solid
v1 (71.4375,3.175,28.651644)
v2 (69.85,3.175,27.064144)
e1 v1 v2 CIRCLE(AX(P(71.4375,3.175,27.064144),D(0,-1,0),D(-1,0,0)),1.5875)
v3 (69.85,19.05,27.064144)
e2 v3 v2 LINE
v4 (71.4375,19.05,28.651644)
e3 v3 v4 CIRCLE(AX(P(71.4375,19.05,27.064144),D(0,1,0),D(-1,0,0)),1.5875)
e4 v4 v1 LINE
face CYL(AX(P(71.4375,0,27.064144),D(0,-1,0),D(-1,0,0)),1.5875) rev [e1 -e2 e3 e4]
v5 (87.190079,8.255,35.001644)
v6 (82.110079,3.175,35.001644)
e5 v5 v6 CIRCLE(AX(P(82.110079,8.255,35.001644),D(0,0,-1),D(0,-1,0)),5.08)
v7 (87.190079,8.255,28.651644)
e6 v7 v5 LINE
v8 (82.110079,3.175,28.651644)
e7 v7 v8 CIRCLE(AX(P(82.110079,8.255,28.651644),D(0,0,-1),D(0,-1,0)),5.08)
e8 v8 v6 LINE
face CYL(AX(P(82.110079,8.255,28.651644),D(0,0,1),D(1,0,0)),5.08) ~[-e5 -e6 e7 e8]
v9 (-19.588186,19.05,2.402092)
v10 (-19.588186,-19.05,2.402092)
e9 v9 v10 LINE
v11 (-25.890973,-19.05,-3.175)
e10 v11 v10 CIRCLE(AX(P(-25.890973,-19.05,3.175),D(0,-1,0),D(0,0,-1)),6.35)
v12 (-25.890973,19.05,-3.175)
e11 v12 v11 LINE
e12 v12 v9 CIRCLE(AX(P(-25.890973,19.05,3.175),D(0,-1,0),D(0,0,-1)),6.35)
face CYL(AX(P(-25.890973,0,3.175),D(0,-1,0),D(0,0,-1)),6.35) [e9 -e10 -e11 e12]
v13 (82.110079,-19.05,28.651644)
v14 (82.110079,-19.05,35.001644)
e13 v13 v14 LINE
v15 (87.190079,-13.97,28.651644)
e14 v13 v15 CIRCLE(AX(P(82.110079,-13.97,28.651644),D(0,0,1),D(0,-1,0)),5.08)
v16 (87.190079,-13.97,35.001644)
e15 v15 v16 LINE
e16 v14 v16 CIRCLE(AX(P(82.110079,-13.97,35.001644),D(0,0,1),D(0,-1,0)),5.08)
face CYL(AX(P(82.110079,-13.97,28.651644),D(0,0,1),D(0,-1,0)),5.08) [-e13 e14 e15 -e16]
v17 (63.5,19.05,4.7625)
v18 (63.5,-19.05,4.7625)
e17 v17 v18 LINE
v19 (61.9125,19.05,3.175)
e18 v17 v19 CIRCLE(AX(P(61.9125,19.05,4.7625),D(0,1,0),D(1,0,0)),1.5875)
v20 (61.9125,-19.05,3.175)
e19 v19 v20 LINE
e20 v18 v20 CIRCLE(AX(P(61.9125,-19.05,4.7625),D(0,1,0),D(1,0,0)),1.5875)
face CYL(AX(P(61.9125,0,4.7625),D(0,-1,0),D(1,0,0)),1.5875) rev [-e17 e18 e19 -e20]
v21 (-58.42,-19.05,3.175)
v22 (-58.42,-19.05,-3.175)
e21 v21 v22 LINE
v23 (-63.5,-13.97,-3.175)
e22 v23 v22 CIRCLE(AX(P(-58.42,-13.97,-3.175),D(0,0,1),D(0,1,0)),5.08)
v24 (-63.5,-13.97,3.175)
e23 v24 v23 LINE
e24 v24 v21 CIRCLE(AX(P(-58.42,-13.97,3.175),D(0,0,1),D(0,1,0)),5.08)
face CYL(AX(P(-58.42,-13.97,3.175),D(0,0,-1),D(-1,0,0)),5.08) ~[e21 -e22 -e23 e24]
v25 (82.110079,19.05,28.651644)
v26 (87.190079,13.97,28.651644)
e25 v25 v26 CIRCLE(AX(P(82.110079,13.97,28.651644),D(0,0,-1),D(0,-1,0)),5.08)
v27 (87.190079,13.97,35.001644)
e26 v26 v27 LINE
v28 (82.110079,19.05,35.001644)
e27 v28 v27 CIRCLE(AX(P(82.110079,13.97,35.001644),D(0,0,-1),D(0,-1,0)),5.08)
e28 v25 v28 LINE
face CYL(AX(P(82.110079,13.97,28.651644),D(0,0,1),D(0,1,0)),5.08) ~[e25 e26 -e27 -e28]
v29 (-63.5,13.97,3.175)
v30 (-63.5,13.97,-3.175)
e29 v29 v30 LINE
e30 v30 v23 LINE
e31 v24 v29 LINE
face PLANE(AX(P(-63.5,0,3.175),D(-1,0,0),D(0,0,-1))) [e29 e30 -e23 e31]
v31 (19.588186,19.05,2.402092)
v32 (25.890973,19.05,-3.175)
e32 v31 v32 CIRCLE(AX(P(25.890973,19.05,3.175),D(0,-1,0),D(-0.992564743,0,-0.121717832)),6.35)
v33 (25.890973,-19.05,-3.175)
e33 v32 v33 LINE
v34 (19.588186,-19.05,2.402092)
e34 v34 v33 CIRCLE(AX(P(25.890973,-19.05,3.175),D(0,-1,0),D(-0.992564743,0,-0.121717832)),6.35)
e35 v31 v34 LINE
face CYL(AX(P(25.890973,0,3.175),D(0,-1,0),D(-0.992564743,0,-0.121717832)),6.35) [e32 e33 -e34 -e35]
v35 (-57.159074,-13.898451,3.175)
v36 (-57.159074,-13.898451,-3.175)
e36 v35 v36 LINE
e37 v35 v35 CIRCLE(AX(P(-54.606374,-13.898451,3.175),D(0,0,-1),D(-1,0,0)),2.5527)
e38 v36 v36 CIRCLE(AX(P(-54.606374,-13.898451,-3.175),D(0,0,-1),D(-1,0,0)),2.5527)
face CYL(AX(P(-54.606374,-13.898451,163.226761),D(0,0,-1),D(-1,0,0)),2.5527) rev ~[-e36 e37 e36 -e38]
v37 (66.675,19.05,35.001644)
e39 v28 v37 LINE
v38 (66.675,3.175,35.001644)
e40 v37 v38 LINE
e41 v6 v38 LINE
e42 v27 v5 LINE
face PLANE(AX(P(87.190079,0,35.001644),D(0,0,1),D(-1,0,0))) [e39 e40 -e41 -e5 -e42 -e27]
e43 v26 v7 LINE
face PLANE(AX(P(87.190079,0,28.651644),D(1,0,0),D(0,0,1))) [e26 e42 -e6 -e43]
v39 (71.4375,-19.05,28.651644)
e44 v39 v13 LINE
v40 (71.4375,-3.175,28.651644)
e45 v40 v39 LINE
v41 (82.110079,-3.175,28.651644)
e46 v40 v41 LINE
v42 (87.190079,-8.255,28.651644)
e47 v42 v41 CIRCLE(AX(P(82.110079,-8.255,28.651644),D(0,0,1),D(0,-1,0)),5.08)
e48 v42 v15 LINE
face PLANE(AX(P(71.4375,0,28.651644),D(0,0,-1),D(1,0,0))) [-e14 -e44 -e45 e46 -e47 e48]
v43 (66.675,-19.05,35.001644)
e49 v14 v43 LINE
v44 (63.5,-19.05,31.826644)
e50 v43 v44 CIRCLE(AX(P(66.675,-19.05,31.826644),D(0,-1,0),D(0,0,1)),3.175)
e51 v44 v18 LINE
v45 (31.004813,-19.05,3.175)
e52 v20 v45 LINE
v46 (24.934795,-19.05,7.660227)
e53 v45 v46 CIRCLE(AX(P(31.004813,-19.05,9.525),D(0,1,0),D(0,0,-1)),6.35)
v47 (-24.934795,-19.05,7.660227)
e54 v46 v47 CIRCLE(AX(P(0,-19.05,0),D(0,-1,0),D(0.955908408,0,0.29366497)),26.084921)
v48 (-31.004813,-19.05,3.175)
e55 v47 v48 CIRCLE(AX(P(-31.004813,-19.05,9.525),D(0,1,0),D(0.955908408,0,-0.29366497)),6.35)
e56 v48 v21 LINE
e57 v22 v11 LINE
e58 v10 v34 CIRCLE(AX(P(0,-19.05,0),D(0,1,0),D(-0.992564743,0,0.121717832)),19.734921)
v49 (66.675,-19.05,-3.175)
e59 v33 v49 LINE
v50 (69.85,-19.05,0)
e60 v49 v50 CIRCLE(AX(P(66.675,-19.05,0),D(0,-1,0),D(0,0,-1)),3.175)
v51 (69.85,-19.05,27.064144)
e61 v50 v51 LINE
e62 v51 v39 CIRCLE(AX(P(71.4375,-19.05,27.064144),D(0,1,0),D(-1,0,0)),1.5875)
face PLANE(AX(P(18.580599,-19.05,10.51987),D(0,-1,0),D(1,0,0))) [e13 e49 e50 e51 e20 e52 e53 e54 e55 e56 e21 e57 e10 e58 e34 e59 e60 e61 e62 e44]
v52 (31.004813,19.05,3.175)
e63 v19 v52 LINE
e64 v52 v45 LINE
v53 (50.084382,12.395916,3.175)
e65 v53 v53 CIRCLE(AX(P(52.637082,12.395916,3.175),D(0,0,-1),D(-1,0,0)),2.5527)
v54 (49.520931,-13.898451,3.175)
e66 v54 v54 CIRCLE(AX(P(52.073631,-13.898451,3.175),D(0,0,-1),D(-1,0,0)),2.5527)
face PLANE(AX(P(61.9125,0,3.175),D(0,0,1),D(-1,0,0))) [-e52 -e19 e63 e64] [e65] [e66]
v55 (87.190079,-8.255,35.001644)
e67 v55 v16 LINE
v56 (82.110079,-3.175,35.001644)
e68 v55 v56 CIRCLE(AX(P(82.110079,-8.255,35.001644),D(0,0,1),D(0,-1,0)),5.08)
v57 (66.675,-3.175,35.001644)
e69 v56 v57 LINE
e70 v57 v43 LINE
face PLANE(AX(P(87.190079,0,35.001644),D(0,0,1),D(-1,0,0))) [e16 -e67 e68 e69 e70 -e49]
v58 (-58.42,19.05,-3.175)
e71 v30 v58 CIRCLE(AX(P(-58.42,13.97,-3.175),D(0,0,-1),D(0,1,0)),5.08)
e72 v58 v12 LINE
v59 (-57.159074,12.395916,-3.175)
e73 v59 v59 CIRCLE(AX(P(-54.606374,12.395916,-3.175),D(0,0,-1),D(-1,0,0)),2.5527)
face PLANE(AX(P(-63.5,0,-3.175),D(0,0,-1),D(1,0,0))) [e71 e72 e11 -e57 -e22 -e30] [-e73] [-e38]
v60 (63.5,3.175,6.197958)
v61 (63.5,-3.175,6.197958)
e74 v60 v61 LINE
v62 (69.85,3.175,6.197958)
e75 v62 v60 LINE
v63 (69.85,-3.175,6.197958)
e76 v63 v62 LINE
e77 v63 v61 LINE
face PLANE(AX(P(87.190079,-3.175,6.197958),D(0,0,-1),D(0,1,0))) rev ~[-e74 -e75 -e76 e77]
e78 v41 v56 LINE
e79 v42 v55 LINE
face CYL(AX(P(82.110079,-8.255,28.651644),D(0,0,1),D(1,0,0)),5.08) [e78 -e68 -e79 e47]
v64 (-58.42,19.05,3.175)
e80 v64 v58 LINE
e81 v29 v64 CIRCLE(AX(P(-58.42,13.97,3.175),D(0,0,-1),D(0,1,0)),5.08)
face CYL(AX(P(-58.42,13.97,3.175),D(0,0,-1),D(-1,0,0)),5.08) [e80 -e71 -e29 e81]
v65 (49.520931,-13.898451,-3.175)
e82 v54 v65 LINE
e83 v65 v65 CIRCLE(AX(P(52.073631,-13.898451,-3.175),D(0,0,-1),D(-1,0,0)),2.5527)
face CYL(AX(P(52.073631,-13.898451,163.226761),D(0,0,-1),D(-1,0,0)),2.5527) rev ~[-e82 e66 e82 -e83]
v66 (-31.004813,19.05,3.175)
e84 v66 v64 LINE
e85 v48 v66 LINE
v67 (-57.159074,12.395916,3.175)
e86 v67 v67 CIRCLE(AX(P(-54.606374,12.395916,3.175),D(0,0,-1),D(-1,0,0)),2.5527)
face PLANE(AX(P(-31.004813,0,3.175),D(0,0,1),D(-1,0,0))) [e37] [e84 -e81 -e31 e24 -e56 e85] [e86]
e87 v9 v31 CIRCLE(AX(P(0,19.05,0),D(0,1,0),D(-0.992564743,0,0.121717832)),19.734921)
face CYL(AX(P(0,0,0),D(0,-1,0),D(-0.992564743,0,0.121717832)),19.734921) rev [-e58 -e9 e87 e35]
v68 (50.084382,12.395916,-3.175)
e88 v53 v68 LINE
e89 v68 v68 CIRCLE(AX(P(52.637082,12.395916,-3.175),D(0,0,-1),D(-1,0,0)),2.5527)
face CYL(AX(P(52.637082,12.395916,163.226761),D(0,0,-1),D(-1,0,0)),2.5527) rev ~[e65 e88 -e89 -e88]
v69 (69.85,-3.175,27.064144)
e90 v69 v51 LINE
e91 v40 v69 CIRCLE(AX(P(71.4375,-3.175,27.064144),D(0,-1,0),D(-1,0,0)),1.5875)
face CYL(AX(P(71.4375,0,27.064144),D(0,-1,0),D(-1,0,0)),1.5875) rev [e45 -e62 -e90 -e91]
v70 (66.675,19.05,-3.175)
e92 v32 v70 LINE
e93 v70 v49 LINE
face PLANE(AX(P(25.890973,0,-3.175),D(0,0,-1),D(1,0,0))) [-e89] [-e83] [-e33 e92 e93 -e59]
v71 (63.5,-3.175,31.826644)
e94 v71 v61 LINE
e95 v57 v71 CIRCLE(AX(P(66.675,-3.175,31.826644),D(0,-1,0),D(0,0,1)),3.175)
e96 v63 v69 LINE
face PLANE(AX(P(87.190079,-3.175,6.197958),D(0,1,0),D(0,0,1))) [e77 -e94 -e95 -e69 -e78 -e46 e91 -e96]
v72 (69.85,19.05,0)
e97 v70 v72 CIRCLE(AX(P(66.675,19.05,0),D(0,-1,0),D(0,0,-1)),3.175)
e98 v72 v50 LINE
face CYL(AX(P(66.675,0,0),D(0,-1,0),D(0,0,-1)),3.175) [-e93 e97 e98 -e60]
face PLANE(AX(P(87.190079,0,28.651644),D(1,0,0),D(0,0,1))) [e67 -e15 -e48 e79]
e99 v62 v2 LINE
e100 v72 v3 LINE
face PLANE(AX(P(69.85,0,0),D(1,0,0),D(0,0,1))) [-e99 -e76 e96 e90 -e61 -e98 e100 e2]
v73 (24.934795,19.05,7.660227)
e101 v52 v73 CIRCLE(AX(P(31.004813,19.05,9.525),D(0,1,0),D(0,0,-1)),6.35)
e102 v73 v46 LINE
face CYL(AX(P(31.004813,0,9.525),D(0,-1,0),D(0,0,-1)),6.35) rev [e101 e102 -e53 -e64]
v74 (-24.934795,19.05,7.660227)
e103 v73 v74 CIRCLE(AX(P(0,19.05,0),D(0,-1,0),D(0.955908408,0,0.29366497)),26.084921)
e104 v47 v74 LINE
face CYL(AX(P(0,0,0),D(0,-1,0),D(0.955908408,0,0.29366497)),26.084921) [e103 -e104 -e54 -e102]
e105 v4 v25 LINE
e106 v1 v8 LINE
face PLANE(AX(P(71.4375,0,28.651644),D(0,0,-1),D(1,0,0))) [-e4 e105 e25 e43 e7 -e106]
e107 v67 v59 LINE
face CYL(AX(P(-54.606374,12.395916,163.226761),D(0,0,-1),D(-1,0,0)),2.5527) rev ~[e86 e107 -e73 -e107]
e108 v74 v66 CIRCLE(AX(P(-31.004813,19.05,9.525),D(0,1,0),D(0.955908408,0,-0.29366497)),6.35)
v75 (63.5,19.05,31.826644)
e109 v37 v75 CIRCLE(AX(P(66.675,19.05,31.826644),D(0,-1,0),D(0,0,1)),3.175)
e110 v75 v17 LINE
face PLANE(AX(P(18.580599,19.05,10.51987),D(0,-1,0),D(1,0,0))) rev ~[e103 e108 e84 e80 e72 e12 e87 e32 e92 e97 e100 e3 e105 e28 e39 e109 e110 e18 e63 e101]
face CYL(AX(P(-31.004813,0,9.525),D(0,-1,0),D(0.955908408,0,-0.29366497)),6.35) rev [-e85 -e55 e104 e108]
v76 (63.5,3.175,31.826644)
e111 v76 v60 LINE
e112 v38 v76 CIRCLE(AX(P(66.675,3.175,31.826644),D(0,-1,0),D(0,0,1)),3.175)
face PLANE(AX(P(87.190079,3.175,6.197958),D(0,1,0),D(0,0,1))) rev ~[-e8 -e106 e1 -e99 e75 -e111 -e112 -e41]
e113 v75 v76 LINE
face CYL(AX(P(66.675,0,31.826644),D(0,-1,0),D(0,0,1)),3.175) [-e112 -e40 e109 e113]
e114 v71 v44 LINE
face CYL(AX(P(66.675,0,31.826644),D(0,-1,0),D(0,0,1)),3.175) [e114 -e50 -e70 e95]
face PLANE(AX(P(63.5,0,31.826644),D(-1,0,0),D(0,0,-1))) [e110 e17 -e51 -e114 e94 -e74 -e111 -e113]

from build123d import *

# Parameters (mm, degrees)
F1_DEPTH = 19.05
F2_W     = 6.35
F2_H     = 28.8036865525
F3_DEPTH = 25.4
F4_R     = 5.08
F6_D     = 5.1054


# Not quite as in the source:
# - a feature names something its author has since deleted; it is built from what else it names


with BuildPart() as f1:
    # F0 (on Front) → F1 (new body, symmetric)
    with BuildSketch(Plane.XZ):
        with BuildLine():
            Line((-63.5, 3.175), (-63.5, -3.175))
            Line((-63.5, -3.175), (-25.8909725642, -3.175))
            ThreePointArc((-25.8909725642, -3.175), (-21.6829722848, -1.5805476707), (-19.5881864455, 2.4020917642))
            ThreePointArc((-19.5881864455, 2.4020917642), (0, 19.7349206501), (19.5881864455, 2.4020917642))
            ThreePointArc((19.5881864455, 2.4020917642), (21.6829722848, -1.5805476707), (25.8909725642, -3.175))
            Line((25.8909725642, -3.175), (63.5, -3.175))
            Line((63.5, -3.175), (66.675, -3.175))
            ThreePointArc((66.675, -3.175), (68.9200640303, -2.2450640303), (69.85, 0))
            Line((69.85, 0), (69.85, 27.0641443402))
            ThreePointArc((69.85, 27.0641443402), (70.3149679849, 28.1866763553), (71.4375, 28.6516443402))
            Line((71.4375, 28.6516443402), (87.1900793672, 28.6516443402))
            Line((87.1900793672, 28.6516443402), (87.1900793672, 35.0016443402))
            Line((87.1900793672, 35.0016443402), (66.675, 35.0016443402))
            ThreePointArc((66.675, 35.0016443402), (64.4299359697, 34.0717083704), (63.5, 31.8266443402))
            Line((63.5, 31.8266443402), (63.5, 4.7625))
            ThreePointArc((63.5, 4.7625), (63.0350320151, 3.6399679849), (61.9125, 3.175))
            Line((61.9125, 3.175), (31.0048133776, 3.175))
            ThreePointArc((31.0048133776, 3.175), (27.2311418069, 4.4179555635), (24.9347949838, 7.6602274404))
            ThreePointArc((24.9347949838, 7.6602274404), (0, 26.0849206501), (-24.9347949838, 7.6602274404))
            ThreePointArc((-24.9347949838, 7.6602274404), (-27.2311418069, 4.4179555635), (-31.0048133776, 3.175))
            Line((-31.0048133776, 3.175), (-63.5, 3.175))
        make_face()
    extrude(amount=F1_DEPTH, both=True)

    # F2 (on face) → F3 (cut)
    with BuildSketch(Plane.YZ.offset(87.1900793672)):
        with Locations((0, 20.5998010639)):
            Rectangle(F2_W, F2_H)
    extrude(amount=-F3_DEPTH, mode=Mode.SUBTRACT)

    # F4
    f4_edges = [f1.edges().sort_by_distance(p)[0] for p in [
        (-63.5, -19.05, 0),
        (-63.5, 19.05, 0),
        (87.190079, 19.05, 31.826644),
        (87.190079, 3.175, 31.826644),
        (87.190079, -3.175, 31.826644),
        (87.190079, -19.05, 31.826644),
    ]]
    fillet(f4_edges, radius=F4_R)

    # F6 (through all)
    with Locations(Plane.XY.offset(3.175)):
        with Locations((-54.6063743532, 12.3959155753), (-54.6063743532, -13.8984508812), (52.6370815933, 12.3959155753), (52.0736314356, -13.8984508812)):
            Hole(F6_D / 2)


solid = f1.part
